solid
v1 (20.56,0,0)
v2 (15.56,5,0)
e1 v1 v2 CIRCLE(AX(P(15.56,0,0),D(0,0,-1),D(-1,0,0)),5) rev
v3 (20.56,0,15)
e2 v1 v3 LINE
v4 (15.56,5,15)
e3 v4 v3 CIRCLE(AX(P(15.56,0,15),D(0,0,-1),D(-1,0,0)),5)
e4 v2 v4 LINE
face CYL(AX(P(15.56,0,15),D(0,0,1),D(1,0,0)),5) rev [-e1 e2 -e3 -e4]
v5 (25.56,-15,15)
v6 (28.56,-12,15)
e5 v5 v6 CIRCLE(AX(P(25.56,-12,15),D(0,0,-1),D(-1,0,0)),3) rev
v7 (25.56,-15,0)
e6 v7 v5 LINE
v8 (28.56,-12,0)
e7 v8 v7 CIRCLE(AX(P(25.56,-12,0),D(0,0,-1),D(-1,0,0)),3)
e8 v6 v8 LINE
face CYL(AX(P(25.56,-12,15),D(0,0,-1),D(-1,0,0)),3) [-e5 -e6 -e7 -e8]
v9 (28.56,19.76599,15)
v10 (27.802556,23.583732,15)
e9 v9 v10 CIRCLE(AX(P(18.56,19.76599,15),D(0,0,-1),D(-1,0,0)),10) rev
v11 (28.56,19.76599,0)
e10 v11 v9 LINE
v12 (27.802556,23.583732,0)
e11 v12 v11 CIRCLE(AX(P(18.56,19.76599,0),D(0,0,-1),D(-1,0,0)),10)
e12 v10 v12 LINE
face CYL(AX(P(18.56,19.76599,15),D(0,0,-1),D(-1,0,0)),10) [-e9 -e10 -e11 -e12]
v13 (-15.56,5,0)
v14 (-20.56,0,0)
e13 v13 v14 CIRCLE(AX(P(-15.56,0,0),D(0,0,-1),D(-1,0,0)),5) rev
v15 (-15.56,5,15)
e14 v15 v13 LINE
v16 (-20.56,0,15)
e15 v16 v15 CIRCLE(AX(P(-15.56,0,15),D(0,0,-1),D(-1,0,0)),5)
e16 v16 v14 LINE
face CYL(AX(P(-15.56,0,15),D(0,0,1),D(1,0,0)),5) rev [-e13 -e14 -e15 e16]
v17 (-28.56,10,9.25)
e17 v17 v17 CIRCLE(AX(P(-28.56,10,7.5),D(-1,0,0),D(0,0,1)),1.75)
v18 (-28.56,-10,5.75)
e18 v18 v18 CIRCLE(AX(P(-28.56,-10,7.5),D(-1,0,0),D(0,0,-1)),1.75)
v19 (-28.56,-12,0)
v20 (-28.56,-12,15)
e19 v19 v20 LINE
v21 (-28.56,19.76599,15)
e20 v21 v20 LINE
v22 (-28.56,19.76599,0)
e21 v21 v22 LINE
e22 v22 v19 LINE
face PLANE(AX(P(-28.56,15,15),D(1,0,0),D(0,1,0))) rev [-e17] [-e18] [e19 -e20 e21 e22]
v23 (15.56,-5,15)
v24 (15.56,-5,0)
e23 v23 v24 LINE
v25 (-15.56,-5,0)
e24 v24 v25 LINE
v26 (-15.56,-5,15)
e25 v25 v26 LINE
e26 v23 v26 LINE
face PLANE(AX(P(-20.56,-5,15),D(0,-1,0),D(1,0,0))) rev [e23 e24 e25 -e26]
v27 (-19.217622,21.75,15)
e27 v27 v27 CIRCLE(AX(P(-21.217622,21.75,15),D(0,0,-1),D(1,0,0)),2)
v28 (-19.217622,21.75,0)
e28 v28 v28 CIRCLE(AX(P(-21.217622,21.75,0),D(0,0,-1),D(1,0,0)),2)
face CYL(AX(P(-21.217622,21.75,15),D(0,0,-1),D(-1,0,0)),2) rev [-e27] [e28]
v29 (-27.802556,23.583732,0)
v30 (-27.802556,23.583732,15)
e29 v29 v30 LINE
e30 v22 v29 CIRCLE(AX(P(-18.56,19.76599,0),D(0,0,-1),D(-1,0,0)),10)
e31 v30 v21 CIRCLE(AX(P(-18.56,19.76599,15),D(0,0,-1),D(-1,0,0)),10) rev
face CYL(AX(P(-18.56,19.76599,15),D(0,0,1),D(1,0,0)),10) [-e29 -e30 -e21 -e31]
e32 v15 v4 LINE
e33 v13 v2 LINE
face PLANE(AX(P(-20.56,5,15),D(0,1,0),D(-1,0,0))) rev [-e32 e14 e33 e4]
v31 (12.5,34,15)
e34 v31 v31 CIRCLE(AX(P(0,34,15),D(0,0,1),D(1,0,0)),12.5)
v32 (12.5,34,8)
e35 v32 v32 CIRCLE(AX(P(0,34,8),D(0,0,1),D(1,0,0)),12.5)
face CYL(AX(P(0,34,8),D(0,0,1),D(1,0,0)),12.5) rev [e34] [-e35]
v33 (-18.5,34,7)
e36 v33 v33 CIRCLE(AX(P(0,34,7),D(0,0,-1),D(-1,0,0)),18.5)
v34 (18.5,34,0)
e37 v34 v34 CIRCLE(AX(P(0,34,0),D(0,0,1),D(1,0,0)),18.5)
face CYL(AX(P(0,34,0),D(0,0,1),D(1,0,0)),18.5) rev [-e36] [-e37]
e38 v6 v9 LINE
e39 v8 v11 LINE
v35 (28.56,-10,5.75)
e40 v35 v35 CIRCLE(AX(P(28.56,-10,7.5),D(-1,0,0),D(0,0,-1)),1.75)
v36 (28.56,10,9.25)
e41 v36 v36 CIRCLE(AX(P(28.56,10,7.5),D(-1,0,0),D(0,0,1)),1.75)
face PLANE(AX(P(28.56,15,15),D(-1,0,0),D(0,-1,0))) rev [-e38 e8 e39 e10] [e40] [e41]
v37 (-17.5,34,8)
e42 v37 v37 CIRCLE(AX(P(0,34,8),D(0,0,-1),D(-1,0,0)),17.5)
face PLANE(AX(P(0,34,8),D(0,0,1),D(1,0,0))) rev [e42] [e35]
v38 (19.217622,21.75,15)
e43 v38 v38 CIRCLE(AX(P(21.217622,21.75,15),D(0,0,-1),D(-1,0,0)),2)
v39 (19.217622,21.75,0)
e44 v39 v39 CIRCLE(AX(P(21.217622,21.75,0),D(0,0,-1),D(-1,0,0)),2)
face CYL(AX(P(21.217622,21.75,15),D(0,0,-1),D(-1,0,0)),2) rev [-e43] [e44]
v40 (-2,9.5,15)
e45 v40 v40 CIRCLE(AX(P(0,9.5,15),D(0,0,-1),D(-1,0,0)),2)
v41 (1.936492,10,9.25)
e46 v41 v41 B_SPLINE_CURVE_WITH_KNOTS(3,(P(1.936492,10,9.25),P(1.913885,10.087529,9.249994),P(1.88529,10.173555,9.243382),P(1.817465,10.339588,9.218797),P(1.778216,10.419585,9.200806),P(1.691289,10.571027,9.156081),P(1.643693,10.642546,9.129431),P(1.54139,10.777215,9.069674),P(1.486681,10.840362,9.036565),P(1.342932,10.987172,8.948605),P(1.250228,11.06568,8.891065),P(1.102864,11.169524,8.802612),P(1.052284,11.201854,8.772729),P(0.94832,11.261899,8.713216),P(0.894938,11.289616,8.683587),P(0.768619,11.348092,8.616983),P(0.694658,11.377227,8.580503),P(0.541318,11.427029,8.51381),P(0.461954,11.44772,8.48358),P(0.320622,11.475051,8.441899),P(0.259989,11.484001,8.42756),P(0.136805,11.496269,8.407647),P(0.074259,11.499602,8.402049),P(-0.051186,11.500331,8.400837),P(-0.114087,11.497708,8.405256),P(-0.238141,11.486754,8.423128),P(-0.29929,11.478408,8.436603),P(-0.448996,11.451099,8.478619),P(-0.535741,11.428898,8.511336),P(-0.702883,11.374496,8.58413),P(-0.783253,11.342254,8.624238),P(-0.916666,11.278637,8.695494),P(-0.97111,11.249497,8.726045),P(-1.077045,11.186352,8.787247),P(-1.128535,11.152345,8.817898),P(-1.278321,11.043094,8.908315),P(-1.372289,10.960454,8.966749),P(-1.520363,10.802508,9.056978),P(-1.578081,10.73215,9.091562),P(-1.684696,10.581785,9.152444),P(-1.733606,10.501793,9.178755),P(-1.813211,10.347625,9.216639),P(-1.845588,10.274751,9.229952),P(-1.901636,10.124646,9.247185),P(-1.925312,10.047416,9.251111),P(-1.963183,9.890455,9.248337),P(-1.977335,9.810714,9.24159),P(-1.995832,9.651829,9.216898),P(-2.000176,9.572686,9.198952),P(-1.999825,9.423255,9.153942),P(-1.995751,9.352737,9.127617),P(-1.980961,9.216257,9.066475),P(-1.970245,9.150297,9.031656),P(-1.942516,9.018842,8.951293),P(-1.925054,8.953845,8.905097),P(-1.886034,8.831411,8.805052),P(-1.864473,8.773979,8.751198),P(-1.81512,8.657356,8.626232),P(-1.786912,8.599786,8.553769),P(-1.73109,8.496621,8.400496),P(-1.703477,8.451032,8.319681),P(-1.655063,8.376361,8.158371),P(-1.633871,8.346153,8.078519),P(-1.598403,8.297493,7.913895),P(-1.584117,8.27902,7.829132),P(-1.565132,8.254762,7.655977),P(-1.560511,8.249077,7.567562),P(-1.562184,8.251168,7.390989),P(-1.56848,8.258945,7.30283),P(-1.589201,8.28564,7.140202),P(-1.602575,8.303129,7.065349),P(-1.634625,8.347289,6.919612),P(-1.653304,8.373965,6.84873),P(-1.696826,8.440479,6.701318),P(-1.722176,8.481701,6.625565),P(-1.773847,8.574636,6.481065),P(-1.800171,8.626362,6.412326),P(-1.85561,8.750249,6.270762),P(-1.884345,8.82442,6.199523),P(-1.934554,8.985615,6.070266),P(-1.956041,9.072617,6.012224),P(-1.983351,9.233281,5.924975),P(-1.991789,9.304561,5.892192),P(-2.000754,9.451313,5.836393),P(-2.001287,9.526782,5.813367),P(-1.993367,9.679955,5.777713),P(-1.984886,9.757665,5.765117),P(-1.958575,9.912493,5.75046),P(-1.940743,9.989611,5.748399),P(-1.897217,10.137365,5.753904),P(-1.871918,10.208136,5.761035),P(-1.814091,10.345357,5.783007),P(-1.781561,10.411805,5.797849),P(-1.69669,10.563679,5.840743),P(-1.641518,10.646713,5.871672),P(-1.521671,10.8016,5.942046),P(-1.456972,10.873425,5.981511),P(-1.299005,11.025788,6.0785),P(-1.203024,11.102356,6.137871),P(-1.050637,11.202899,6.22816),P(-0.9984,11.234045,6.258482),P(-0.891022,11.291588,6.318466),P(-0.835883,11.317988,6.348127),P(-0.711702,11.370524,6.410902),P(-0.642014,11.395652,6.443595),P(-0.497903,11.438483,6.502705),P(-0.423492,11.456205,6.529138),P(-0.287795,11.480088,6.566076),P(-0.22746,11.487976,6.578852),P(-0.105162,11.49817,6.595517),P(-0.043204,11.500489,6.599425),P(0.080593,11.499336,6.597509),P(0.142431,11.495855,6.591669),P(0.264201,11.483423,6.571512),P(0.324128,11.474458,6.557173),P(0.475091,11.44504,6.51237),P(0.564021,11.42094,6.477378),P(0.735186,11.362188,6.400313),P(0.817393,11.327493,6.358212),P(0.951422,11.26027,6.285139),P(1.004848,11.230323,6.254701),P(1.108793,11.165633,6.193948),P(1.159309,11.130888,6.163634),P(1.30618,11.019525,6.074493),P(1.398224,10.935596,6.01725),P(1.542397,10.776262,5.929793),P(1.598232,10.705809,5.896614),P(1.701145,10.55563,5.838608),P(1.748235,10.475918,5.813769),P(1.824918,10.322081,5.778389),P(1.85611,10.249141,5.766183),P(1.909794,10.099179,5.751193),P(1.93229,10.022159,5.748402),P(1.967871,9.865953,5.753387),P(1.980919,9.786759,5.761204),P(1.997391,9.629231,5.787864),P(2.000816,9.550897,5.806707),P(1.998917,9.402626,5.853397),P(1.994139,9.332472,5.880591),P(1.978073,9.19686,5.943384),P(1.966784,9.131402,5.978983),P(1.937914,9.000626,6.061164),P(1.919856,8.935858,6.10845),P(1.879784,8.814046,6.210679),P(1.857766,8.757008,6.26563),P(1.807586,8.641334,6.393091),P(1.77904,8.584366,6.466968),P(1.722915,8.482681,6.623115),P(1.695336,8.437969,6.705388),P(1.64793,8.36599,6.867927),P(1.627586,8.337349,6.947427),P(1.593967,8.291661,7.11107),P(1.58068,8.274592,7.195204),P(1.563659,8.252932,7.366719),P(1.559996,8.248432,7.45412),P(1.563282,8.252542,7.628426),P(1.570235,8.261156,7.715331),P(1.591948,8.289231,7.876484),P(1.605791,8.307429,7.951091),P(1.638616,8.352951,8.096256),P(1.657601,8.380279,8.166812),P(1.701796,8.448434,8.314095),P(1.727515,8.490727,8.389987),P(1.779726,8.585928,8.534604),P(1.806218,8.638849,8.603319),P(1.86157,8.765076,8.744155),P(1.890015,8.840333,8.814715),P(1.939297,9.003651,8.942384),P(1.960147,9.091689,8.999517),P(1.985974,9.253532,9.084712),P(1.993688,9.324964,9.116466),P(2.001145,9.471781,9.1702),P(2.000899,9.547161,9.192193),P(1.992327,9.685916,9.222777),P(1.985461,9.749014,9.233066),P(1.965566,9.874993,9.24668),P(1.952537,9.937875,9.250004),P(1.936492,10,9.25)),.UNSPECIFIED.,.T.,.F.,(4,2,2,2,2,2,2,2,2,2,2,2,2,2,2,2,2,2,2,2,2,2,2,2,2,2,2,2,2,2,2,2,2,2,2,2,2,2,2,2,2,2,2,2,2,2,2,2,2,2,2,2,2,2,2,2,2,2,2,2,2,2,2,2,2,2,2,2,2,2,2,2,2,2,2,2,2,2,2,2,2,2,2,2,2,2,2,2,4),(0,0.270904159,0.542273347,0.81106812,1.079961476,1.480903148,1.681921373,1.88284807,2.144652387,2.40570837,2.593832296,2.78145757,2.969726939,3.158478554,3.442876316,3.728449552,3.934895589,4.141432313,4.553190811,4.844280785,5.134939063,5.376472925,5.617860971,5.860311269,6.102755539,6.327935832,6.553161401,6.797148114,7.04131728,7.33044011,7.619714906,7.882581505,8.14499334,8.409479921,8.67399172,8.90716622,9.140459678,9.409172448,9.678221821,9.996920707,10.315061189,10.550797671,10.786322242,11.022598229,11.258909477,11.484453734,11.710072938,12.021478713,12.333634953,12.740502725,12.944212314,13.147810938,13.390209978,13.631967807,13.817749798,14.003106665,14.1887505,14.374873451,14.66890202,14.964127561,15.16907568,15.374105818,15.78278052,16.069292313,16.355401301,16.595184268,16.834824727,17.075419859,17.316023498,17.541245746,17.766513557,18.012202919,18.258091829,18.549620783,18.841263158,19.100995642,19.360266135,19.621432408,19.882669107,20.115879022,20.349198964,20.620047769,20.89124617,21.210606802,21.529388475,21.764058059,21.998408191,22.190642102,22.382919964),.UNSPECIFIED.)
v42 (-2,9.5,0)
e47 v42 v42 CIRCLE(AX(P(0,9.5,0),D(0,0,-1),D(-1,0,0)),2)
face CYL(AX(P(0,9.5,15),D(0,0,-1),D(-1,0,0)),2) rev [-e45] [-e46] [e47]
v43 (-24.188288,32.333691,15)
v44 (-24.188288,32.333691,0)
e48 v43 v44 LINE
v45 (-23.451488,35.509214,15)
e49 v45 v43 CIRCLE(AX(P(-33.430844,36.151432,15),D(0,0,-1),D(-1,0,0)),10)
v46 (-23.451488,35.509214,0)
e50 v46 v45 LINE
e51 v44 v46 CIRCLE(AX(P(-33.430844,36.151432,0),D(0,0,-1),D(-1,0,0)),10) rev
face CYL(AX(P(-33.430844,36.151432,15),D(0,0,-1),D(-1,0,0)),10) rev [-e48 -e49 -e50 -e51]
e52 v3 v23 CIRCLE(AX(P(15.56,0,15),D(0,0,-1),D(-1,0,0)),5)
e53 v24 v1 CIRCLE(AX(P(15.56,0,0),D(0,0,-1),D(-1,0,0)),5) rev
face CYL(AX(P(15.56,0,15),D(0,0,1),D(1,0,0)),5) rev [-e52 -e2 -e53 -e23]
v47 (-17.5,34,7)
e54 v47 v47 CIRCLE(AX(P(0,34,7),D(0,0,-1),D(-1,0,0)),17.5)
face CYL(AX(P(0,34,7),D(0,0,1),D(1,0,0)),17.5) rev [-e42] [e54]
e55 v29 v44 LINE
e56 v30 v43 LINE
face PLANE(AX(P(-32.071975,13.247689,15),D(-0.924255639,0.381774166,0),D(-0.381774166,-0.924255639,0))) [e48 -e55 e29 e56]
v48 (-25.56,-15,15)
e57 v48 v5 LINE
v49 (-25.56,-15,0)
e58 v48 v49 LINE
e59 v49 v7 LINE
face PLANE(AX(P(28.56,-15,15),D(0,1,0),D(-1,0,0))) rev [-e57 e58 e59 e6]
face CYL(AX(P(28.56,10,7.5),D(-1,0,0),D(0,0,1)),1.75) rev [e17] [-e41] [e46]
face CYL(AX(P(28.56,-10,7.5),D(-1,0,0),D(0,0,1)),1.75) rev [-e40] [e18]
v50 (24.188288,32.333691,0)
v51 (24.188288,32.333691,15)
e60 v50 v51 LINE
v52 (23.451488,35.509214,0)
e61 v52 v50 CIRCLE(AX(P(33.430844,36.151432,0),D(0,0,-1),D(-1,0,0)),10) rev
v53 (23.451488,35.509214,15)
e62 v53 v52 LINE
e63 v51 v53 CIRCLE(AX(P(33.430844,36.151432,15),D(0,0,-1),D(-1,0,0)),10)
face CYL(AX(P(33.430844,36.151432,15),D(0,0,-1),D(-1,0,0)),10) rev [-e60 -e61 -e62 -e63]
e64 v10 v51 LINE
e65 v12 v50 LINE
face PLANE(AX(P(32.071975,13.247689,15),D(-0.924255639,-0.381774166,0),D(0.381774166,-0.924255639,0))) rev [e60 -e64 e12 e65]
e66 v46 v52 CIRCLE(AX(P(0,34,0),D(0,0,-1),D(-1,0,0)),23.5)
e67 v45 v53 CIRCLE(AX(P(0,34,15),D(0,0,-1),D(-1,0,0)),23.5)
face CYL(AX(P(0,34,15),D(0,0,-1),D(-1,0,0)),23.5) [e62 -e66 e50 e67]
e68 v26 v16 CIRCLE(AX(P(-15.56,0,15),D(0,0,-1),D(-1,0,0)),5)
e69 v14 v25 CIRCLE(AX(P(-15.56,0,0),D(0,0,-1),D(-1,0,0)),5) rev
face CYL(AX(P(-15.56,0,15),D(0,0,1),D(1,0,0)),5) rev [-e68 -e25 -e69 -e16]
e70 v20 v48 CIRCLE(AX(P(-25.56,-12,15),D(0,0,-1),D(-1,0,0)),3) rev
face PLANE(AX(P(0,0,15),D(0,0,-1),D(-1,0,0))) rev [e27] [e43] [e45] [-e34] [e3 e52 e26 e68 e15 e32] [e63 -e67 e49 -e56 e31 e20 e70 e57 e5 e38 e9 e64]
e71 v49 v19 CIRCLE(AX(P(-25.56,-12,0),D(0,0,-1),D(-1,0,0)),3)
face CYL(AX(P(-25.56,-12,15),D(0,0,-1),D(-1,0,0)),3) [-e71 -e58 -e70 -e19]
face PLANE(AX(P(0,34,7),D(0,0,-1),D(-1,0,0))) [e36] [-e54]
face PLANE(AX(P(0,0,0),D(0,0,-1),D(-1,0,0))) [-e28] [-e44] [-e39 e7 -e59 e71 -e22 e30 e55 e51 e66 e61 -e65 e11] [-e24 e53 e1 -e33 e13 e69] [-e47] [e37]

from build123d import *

# Parameters (mm, degrees)
SKETCH_1_W          = 57.12
SKETCH_1_H          = 30
EXTRUDE_1_DEPTH     = 15
SKETCH_2_R          = 1.75
CUT_EXTRUDE_1_DEPTH = 61.93188328
SKETCH_4_R          = 18.5
EXTRUDE_4_DEPTH     = 15
SKETCH_5_R          = 18.5
SKETCH_5_R_2        = 12.5
EXTRUDE_5_DEPTH     = 7
SKETCH_6_R          = 18.5
SKETCH_6_R_2        = 17.5
EXTRUDE_6_DEPTH     = 1
FILLET_1_R          = 3
SKETCH_7_R          = 2
CUT_EXTRUDE_2_DEPTH = 71.387692106
CUT_EXTRUDE_3_DEPTH = 71.387692168
FILLET_2_R          = 10
SKETCH_9_W          = 41.12
SKETCH_9_H          = 10
CUT_EXTRUDE_4_DEPTH = 66.931203604
FILLET_3_R          = 5


with BuildPart() as part:
    # ｽｹｯﾁ1 → ﾎﾞｽ - 押し出し1 (new body)
    with BuildSketch(Plane.XY):
        Rectangle(SKETCH_1_W, SKETCH_1_H)
    extrude(amount=EXTRUDE_1_DEPTH)

    # ｽｹｯﾁ2 → ｶｯﾄ - 押し出し1 (cut, through all)
    with BuildSketch(Plane.ZY.offset(28.56)):
        with Locations((7.5, 10)):
            Circle(SKETCH_2_R)
        with Locations(Location((7.5, -10, 0), (0, 0, 180))):
            Circle(SKETCH_2_R)
    extrude(amount=-CUT_EXTRUDE_1_DEPTH, mode=Mode.SUBTRACT)

    # ｽｹｯﾁ4 → ﾎﾞｽ - 押し出し4 (add, through all)
    with BuildSketch(Plane.XY.offset(15)):
        with BuildLine():
            Line((-28.56, 34), (-28.56, 15))
            Line((-28.56, 15), (28.56, 15))
            Line((28.56, 15), (28.56, 34))
            ThreePointArc((28.56, 34), (0, 62.56), (-28.56, 34))
        make_face()
        with Locations((0, 34)):
            Circle(SKETCH_4_R, mode=Mode.SUBTRACT)
    extrude(amount=-EXTRUDE_4_DEPTH)

    # ｽｹｯﾁ5 → ﾎﾞｽ - 押し出し5 (add)
    with BuildSketch(Plane.XY.offset(15)):
        with Locations((0, 34)):
            Circle(SKETCH_5_R)
        with Locations((0, 34)):
            Circle(SKETCH_5_R_2, mode=Mode.SUBTRACT)
    extrude(amount=-EXTRUDE_5_DEPTH)

    # ｽｹｯﾁ6 → ﾎﾞｽ - 押し出し6 (add)
    with BuildSketch(Plane(origin=(0, 0, 8), x_dir=(-1, 0, 0), z_dir=(0, 0, -1))):
        with Locations(Location((0, 34, 0), (0, 0, 180))):
            Circle(SKETCH_6_R)
        with Locations((0, 34)):
            Circle(SKETCH_6_R_2, mode=Mode.SUBTRACT)
    extrude(amount=EXTRUDE_6_DEPTH)

    # ﾌｨﾚｯﾄ1
    fillet_1_edges = [part.edges().sort_by_distance(p)[0] for p in [
        (28.56, -15, 7.5),
        (-28.56, -15, 7.5),
    ]]
    fillet(fillet_1_edges, radius=FILLET_1_R)

    # ｽｹｯﾁ7 → ｶｯﾄ - 押し出し2 (cut, through all)
    with BuildSketch(Plane(origin=(0, 0, 0), x_dir=(-1, 0, 0), z_dir=(0, 0, -1))):
        with Locations((0, 9.5)):
            Circle(SKETCH_7_R)
        with Locations((-21.217622393, 21.75)):
            Circle(SKETCH_7_R)
        with Locations(Location((21.217622393, 21.75, 0), (0, 0, 180))):
            Circle(SKETCH_7_R)
    extrude(amount=-CUT_EXTRUDE_2_DEPTH, mode=Mode.SUBTRACT)

    # ｽｹｯﾁ8 → ｶｯﾄ - 押し出し3 (cut, through all)
    with BuildSketch(Plane(origin=(0, 0, 0), x_dir=(-1, 0, 0), z_dir=(0, 0, -1))):
        with BuildLine():
            Line((-28.56, 34), (-28.56, 21.75))
            Line((-28.56, 21.75), (-23.5, 34))
            ThreePointArc((-23.5, 34), (0, 57.5), (23.5, 34))
            Line((23.5, 34), (28.56, 21.75))
            Line((28.56, 21.75), (28.56, 34))
            ThreePointArc((28.56, 34), (0, 62.56), (-28.56, 34))
        make_face()
    extrude(amount=-CUT_EXTRUDE_3_DEPTH, mode=Mode.SUBTRACT)

    # ﾌｨﾚｯﾄ2
    fillet_2_edges = [part.edges().sort_by_distance(p)[0] for p in [
        (23.5, 34, 7.5),
        (28.56, 21.75, 7.5),
        (-28.56, 21.75, 7.5),
        (-23.5, 34, 7.5),
    ]]
    fillet(fillet_2_edges, radius=FILLET_2_R)

    # ｽｹｯﾁ9 → ｶｯﾄ - 押し出し4 (cut, through all)
    with BuildSketch(Plane(origin=(0, 0, 0), x_dir=(-1, 0, 0), z_dir=(0, 0, -1))):
        Rectangle(SKETCH_9_W, SKETCH_9_H)
    extrude(amount=-CUT_EXTRUDE_4_DEPTH, mode=Mode.SUBTRACT)

    # ﾌｨﾚｯﾄ3
    fillet_3_edges = [part.edges().sort_by_distance(p)[0] for p in [
        (-20.56, 5, 7.5),
        (-20.56, -5, 7.5),
        (20.56, 5, 7.5),
        (20.56, -5, 7.5),
    ]]
    fillet(fillet_3_edges, radius=FILLET_3_R - 0.0001)  # a hair under: the kernel refuses the full size


solid = part.part
